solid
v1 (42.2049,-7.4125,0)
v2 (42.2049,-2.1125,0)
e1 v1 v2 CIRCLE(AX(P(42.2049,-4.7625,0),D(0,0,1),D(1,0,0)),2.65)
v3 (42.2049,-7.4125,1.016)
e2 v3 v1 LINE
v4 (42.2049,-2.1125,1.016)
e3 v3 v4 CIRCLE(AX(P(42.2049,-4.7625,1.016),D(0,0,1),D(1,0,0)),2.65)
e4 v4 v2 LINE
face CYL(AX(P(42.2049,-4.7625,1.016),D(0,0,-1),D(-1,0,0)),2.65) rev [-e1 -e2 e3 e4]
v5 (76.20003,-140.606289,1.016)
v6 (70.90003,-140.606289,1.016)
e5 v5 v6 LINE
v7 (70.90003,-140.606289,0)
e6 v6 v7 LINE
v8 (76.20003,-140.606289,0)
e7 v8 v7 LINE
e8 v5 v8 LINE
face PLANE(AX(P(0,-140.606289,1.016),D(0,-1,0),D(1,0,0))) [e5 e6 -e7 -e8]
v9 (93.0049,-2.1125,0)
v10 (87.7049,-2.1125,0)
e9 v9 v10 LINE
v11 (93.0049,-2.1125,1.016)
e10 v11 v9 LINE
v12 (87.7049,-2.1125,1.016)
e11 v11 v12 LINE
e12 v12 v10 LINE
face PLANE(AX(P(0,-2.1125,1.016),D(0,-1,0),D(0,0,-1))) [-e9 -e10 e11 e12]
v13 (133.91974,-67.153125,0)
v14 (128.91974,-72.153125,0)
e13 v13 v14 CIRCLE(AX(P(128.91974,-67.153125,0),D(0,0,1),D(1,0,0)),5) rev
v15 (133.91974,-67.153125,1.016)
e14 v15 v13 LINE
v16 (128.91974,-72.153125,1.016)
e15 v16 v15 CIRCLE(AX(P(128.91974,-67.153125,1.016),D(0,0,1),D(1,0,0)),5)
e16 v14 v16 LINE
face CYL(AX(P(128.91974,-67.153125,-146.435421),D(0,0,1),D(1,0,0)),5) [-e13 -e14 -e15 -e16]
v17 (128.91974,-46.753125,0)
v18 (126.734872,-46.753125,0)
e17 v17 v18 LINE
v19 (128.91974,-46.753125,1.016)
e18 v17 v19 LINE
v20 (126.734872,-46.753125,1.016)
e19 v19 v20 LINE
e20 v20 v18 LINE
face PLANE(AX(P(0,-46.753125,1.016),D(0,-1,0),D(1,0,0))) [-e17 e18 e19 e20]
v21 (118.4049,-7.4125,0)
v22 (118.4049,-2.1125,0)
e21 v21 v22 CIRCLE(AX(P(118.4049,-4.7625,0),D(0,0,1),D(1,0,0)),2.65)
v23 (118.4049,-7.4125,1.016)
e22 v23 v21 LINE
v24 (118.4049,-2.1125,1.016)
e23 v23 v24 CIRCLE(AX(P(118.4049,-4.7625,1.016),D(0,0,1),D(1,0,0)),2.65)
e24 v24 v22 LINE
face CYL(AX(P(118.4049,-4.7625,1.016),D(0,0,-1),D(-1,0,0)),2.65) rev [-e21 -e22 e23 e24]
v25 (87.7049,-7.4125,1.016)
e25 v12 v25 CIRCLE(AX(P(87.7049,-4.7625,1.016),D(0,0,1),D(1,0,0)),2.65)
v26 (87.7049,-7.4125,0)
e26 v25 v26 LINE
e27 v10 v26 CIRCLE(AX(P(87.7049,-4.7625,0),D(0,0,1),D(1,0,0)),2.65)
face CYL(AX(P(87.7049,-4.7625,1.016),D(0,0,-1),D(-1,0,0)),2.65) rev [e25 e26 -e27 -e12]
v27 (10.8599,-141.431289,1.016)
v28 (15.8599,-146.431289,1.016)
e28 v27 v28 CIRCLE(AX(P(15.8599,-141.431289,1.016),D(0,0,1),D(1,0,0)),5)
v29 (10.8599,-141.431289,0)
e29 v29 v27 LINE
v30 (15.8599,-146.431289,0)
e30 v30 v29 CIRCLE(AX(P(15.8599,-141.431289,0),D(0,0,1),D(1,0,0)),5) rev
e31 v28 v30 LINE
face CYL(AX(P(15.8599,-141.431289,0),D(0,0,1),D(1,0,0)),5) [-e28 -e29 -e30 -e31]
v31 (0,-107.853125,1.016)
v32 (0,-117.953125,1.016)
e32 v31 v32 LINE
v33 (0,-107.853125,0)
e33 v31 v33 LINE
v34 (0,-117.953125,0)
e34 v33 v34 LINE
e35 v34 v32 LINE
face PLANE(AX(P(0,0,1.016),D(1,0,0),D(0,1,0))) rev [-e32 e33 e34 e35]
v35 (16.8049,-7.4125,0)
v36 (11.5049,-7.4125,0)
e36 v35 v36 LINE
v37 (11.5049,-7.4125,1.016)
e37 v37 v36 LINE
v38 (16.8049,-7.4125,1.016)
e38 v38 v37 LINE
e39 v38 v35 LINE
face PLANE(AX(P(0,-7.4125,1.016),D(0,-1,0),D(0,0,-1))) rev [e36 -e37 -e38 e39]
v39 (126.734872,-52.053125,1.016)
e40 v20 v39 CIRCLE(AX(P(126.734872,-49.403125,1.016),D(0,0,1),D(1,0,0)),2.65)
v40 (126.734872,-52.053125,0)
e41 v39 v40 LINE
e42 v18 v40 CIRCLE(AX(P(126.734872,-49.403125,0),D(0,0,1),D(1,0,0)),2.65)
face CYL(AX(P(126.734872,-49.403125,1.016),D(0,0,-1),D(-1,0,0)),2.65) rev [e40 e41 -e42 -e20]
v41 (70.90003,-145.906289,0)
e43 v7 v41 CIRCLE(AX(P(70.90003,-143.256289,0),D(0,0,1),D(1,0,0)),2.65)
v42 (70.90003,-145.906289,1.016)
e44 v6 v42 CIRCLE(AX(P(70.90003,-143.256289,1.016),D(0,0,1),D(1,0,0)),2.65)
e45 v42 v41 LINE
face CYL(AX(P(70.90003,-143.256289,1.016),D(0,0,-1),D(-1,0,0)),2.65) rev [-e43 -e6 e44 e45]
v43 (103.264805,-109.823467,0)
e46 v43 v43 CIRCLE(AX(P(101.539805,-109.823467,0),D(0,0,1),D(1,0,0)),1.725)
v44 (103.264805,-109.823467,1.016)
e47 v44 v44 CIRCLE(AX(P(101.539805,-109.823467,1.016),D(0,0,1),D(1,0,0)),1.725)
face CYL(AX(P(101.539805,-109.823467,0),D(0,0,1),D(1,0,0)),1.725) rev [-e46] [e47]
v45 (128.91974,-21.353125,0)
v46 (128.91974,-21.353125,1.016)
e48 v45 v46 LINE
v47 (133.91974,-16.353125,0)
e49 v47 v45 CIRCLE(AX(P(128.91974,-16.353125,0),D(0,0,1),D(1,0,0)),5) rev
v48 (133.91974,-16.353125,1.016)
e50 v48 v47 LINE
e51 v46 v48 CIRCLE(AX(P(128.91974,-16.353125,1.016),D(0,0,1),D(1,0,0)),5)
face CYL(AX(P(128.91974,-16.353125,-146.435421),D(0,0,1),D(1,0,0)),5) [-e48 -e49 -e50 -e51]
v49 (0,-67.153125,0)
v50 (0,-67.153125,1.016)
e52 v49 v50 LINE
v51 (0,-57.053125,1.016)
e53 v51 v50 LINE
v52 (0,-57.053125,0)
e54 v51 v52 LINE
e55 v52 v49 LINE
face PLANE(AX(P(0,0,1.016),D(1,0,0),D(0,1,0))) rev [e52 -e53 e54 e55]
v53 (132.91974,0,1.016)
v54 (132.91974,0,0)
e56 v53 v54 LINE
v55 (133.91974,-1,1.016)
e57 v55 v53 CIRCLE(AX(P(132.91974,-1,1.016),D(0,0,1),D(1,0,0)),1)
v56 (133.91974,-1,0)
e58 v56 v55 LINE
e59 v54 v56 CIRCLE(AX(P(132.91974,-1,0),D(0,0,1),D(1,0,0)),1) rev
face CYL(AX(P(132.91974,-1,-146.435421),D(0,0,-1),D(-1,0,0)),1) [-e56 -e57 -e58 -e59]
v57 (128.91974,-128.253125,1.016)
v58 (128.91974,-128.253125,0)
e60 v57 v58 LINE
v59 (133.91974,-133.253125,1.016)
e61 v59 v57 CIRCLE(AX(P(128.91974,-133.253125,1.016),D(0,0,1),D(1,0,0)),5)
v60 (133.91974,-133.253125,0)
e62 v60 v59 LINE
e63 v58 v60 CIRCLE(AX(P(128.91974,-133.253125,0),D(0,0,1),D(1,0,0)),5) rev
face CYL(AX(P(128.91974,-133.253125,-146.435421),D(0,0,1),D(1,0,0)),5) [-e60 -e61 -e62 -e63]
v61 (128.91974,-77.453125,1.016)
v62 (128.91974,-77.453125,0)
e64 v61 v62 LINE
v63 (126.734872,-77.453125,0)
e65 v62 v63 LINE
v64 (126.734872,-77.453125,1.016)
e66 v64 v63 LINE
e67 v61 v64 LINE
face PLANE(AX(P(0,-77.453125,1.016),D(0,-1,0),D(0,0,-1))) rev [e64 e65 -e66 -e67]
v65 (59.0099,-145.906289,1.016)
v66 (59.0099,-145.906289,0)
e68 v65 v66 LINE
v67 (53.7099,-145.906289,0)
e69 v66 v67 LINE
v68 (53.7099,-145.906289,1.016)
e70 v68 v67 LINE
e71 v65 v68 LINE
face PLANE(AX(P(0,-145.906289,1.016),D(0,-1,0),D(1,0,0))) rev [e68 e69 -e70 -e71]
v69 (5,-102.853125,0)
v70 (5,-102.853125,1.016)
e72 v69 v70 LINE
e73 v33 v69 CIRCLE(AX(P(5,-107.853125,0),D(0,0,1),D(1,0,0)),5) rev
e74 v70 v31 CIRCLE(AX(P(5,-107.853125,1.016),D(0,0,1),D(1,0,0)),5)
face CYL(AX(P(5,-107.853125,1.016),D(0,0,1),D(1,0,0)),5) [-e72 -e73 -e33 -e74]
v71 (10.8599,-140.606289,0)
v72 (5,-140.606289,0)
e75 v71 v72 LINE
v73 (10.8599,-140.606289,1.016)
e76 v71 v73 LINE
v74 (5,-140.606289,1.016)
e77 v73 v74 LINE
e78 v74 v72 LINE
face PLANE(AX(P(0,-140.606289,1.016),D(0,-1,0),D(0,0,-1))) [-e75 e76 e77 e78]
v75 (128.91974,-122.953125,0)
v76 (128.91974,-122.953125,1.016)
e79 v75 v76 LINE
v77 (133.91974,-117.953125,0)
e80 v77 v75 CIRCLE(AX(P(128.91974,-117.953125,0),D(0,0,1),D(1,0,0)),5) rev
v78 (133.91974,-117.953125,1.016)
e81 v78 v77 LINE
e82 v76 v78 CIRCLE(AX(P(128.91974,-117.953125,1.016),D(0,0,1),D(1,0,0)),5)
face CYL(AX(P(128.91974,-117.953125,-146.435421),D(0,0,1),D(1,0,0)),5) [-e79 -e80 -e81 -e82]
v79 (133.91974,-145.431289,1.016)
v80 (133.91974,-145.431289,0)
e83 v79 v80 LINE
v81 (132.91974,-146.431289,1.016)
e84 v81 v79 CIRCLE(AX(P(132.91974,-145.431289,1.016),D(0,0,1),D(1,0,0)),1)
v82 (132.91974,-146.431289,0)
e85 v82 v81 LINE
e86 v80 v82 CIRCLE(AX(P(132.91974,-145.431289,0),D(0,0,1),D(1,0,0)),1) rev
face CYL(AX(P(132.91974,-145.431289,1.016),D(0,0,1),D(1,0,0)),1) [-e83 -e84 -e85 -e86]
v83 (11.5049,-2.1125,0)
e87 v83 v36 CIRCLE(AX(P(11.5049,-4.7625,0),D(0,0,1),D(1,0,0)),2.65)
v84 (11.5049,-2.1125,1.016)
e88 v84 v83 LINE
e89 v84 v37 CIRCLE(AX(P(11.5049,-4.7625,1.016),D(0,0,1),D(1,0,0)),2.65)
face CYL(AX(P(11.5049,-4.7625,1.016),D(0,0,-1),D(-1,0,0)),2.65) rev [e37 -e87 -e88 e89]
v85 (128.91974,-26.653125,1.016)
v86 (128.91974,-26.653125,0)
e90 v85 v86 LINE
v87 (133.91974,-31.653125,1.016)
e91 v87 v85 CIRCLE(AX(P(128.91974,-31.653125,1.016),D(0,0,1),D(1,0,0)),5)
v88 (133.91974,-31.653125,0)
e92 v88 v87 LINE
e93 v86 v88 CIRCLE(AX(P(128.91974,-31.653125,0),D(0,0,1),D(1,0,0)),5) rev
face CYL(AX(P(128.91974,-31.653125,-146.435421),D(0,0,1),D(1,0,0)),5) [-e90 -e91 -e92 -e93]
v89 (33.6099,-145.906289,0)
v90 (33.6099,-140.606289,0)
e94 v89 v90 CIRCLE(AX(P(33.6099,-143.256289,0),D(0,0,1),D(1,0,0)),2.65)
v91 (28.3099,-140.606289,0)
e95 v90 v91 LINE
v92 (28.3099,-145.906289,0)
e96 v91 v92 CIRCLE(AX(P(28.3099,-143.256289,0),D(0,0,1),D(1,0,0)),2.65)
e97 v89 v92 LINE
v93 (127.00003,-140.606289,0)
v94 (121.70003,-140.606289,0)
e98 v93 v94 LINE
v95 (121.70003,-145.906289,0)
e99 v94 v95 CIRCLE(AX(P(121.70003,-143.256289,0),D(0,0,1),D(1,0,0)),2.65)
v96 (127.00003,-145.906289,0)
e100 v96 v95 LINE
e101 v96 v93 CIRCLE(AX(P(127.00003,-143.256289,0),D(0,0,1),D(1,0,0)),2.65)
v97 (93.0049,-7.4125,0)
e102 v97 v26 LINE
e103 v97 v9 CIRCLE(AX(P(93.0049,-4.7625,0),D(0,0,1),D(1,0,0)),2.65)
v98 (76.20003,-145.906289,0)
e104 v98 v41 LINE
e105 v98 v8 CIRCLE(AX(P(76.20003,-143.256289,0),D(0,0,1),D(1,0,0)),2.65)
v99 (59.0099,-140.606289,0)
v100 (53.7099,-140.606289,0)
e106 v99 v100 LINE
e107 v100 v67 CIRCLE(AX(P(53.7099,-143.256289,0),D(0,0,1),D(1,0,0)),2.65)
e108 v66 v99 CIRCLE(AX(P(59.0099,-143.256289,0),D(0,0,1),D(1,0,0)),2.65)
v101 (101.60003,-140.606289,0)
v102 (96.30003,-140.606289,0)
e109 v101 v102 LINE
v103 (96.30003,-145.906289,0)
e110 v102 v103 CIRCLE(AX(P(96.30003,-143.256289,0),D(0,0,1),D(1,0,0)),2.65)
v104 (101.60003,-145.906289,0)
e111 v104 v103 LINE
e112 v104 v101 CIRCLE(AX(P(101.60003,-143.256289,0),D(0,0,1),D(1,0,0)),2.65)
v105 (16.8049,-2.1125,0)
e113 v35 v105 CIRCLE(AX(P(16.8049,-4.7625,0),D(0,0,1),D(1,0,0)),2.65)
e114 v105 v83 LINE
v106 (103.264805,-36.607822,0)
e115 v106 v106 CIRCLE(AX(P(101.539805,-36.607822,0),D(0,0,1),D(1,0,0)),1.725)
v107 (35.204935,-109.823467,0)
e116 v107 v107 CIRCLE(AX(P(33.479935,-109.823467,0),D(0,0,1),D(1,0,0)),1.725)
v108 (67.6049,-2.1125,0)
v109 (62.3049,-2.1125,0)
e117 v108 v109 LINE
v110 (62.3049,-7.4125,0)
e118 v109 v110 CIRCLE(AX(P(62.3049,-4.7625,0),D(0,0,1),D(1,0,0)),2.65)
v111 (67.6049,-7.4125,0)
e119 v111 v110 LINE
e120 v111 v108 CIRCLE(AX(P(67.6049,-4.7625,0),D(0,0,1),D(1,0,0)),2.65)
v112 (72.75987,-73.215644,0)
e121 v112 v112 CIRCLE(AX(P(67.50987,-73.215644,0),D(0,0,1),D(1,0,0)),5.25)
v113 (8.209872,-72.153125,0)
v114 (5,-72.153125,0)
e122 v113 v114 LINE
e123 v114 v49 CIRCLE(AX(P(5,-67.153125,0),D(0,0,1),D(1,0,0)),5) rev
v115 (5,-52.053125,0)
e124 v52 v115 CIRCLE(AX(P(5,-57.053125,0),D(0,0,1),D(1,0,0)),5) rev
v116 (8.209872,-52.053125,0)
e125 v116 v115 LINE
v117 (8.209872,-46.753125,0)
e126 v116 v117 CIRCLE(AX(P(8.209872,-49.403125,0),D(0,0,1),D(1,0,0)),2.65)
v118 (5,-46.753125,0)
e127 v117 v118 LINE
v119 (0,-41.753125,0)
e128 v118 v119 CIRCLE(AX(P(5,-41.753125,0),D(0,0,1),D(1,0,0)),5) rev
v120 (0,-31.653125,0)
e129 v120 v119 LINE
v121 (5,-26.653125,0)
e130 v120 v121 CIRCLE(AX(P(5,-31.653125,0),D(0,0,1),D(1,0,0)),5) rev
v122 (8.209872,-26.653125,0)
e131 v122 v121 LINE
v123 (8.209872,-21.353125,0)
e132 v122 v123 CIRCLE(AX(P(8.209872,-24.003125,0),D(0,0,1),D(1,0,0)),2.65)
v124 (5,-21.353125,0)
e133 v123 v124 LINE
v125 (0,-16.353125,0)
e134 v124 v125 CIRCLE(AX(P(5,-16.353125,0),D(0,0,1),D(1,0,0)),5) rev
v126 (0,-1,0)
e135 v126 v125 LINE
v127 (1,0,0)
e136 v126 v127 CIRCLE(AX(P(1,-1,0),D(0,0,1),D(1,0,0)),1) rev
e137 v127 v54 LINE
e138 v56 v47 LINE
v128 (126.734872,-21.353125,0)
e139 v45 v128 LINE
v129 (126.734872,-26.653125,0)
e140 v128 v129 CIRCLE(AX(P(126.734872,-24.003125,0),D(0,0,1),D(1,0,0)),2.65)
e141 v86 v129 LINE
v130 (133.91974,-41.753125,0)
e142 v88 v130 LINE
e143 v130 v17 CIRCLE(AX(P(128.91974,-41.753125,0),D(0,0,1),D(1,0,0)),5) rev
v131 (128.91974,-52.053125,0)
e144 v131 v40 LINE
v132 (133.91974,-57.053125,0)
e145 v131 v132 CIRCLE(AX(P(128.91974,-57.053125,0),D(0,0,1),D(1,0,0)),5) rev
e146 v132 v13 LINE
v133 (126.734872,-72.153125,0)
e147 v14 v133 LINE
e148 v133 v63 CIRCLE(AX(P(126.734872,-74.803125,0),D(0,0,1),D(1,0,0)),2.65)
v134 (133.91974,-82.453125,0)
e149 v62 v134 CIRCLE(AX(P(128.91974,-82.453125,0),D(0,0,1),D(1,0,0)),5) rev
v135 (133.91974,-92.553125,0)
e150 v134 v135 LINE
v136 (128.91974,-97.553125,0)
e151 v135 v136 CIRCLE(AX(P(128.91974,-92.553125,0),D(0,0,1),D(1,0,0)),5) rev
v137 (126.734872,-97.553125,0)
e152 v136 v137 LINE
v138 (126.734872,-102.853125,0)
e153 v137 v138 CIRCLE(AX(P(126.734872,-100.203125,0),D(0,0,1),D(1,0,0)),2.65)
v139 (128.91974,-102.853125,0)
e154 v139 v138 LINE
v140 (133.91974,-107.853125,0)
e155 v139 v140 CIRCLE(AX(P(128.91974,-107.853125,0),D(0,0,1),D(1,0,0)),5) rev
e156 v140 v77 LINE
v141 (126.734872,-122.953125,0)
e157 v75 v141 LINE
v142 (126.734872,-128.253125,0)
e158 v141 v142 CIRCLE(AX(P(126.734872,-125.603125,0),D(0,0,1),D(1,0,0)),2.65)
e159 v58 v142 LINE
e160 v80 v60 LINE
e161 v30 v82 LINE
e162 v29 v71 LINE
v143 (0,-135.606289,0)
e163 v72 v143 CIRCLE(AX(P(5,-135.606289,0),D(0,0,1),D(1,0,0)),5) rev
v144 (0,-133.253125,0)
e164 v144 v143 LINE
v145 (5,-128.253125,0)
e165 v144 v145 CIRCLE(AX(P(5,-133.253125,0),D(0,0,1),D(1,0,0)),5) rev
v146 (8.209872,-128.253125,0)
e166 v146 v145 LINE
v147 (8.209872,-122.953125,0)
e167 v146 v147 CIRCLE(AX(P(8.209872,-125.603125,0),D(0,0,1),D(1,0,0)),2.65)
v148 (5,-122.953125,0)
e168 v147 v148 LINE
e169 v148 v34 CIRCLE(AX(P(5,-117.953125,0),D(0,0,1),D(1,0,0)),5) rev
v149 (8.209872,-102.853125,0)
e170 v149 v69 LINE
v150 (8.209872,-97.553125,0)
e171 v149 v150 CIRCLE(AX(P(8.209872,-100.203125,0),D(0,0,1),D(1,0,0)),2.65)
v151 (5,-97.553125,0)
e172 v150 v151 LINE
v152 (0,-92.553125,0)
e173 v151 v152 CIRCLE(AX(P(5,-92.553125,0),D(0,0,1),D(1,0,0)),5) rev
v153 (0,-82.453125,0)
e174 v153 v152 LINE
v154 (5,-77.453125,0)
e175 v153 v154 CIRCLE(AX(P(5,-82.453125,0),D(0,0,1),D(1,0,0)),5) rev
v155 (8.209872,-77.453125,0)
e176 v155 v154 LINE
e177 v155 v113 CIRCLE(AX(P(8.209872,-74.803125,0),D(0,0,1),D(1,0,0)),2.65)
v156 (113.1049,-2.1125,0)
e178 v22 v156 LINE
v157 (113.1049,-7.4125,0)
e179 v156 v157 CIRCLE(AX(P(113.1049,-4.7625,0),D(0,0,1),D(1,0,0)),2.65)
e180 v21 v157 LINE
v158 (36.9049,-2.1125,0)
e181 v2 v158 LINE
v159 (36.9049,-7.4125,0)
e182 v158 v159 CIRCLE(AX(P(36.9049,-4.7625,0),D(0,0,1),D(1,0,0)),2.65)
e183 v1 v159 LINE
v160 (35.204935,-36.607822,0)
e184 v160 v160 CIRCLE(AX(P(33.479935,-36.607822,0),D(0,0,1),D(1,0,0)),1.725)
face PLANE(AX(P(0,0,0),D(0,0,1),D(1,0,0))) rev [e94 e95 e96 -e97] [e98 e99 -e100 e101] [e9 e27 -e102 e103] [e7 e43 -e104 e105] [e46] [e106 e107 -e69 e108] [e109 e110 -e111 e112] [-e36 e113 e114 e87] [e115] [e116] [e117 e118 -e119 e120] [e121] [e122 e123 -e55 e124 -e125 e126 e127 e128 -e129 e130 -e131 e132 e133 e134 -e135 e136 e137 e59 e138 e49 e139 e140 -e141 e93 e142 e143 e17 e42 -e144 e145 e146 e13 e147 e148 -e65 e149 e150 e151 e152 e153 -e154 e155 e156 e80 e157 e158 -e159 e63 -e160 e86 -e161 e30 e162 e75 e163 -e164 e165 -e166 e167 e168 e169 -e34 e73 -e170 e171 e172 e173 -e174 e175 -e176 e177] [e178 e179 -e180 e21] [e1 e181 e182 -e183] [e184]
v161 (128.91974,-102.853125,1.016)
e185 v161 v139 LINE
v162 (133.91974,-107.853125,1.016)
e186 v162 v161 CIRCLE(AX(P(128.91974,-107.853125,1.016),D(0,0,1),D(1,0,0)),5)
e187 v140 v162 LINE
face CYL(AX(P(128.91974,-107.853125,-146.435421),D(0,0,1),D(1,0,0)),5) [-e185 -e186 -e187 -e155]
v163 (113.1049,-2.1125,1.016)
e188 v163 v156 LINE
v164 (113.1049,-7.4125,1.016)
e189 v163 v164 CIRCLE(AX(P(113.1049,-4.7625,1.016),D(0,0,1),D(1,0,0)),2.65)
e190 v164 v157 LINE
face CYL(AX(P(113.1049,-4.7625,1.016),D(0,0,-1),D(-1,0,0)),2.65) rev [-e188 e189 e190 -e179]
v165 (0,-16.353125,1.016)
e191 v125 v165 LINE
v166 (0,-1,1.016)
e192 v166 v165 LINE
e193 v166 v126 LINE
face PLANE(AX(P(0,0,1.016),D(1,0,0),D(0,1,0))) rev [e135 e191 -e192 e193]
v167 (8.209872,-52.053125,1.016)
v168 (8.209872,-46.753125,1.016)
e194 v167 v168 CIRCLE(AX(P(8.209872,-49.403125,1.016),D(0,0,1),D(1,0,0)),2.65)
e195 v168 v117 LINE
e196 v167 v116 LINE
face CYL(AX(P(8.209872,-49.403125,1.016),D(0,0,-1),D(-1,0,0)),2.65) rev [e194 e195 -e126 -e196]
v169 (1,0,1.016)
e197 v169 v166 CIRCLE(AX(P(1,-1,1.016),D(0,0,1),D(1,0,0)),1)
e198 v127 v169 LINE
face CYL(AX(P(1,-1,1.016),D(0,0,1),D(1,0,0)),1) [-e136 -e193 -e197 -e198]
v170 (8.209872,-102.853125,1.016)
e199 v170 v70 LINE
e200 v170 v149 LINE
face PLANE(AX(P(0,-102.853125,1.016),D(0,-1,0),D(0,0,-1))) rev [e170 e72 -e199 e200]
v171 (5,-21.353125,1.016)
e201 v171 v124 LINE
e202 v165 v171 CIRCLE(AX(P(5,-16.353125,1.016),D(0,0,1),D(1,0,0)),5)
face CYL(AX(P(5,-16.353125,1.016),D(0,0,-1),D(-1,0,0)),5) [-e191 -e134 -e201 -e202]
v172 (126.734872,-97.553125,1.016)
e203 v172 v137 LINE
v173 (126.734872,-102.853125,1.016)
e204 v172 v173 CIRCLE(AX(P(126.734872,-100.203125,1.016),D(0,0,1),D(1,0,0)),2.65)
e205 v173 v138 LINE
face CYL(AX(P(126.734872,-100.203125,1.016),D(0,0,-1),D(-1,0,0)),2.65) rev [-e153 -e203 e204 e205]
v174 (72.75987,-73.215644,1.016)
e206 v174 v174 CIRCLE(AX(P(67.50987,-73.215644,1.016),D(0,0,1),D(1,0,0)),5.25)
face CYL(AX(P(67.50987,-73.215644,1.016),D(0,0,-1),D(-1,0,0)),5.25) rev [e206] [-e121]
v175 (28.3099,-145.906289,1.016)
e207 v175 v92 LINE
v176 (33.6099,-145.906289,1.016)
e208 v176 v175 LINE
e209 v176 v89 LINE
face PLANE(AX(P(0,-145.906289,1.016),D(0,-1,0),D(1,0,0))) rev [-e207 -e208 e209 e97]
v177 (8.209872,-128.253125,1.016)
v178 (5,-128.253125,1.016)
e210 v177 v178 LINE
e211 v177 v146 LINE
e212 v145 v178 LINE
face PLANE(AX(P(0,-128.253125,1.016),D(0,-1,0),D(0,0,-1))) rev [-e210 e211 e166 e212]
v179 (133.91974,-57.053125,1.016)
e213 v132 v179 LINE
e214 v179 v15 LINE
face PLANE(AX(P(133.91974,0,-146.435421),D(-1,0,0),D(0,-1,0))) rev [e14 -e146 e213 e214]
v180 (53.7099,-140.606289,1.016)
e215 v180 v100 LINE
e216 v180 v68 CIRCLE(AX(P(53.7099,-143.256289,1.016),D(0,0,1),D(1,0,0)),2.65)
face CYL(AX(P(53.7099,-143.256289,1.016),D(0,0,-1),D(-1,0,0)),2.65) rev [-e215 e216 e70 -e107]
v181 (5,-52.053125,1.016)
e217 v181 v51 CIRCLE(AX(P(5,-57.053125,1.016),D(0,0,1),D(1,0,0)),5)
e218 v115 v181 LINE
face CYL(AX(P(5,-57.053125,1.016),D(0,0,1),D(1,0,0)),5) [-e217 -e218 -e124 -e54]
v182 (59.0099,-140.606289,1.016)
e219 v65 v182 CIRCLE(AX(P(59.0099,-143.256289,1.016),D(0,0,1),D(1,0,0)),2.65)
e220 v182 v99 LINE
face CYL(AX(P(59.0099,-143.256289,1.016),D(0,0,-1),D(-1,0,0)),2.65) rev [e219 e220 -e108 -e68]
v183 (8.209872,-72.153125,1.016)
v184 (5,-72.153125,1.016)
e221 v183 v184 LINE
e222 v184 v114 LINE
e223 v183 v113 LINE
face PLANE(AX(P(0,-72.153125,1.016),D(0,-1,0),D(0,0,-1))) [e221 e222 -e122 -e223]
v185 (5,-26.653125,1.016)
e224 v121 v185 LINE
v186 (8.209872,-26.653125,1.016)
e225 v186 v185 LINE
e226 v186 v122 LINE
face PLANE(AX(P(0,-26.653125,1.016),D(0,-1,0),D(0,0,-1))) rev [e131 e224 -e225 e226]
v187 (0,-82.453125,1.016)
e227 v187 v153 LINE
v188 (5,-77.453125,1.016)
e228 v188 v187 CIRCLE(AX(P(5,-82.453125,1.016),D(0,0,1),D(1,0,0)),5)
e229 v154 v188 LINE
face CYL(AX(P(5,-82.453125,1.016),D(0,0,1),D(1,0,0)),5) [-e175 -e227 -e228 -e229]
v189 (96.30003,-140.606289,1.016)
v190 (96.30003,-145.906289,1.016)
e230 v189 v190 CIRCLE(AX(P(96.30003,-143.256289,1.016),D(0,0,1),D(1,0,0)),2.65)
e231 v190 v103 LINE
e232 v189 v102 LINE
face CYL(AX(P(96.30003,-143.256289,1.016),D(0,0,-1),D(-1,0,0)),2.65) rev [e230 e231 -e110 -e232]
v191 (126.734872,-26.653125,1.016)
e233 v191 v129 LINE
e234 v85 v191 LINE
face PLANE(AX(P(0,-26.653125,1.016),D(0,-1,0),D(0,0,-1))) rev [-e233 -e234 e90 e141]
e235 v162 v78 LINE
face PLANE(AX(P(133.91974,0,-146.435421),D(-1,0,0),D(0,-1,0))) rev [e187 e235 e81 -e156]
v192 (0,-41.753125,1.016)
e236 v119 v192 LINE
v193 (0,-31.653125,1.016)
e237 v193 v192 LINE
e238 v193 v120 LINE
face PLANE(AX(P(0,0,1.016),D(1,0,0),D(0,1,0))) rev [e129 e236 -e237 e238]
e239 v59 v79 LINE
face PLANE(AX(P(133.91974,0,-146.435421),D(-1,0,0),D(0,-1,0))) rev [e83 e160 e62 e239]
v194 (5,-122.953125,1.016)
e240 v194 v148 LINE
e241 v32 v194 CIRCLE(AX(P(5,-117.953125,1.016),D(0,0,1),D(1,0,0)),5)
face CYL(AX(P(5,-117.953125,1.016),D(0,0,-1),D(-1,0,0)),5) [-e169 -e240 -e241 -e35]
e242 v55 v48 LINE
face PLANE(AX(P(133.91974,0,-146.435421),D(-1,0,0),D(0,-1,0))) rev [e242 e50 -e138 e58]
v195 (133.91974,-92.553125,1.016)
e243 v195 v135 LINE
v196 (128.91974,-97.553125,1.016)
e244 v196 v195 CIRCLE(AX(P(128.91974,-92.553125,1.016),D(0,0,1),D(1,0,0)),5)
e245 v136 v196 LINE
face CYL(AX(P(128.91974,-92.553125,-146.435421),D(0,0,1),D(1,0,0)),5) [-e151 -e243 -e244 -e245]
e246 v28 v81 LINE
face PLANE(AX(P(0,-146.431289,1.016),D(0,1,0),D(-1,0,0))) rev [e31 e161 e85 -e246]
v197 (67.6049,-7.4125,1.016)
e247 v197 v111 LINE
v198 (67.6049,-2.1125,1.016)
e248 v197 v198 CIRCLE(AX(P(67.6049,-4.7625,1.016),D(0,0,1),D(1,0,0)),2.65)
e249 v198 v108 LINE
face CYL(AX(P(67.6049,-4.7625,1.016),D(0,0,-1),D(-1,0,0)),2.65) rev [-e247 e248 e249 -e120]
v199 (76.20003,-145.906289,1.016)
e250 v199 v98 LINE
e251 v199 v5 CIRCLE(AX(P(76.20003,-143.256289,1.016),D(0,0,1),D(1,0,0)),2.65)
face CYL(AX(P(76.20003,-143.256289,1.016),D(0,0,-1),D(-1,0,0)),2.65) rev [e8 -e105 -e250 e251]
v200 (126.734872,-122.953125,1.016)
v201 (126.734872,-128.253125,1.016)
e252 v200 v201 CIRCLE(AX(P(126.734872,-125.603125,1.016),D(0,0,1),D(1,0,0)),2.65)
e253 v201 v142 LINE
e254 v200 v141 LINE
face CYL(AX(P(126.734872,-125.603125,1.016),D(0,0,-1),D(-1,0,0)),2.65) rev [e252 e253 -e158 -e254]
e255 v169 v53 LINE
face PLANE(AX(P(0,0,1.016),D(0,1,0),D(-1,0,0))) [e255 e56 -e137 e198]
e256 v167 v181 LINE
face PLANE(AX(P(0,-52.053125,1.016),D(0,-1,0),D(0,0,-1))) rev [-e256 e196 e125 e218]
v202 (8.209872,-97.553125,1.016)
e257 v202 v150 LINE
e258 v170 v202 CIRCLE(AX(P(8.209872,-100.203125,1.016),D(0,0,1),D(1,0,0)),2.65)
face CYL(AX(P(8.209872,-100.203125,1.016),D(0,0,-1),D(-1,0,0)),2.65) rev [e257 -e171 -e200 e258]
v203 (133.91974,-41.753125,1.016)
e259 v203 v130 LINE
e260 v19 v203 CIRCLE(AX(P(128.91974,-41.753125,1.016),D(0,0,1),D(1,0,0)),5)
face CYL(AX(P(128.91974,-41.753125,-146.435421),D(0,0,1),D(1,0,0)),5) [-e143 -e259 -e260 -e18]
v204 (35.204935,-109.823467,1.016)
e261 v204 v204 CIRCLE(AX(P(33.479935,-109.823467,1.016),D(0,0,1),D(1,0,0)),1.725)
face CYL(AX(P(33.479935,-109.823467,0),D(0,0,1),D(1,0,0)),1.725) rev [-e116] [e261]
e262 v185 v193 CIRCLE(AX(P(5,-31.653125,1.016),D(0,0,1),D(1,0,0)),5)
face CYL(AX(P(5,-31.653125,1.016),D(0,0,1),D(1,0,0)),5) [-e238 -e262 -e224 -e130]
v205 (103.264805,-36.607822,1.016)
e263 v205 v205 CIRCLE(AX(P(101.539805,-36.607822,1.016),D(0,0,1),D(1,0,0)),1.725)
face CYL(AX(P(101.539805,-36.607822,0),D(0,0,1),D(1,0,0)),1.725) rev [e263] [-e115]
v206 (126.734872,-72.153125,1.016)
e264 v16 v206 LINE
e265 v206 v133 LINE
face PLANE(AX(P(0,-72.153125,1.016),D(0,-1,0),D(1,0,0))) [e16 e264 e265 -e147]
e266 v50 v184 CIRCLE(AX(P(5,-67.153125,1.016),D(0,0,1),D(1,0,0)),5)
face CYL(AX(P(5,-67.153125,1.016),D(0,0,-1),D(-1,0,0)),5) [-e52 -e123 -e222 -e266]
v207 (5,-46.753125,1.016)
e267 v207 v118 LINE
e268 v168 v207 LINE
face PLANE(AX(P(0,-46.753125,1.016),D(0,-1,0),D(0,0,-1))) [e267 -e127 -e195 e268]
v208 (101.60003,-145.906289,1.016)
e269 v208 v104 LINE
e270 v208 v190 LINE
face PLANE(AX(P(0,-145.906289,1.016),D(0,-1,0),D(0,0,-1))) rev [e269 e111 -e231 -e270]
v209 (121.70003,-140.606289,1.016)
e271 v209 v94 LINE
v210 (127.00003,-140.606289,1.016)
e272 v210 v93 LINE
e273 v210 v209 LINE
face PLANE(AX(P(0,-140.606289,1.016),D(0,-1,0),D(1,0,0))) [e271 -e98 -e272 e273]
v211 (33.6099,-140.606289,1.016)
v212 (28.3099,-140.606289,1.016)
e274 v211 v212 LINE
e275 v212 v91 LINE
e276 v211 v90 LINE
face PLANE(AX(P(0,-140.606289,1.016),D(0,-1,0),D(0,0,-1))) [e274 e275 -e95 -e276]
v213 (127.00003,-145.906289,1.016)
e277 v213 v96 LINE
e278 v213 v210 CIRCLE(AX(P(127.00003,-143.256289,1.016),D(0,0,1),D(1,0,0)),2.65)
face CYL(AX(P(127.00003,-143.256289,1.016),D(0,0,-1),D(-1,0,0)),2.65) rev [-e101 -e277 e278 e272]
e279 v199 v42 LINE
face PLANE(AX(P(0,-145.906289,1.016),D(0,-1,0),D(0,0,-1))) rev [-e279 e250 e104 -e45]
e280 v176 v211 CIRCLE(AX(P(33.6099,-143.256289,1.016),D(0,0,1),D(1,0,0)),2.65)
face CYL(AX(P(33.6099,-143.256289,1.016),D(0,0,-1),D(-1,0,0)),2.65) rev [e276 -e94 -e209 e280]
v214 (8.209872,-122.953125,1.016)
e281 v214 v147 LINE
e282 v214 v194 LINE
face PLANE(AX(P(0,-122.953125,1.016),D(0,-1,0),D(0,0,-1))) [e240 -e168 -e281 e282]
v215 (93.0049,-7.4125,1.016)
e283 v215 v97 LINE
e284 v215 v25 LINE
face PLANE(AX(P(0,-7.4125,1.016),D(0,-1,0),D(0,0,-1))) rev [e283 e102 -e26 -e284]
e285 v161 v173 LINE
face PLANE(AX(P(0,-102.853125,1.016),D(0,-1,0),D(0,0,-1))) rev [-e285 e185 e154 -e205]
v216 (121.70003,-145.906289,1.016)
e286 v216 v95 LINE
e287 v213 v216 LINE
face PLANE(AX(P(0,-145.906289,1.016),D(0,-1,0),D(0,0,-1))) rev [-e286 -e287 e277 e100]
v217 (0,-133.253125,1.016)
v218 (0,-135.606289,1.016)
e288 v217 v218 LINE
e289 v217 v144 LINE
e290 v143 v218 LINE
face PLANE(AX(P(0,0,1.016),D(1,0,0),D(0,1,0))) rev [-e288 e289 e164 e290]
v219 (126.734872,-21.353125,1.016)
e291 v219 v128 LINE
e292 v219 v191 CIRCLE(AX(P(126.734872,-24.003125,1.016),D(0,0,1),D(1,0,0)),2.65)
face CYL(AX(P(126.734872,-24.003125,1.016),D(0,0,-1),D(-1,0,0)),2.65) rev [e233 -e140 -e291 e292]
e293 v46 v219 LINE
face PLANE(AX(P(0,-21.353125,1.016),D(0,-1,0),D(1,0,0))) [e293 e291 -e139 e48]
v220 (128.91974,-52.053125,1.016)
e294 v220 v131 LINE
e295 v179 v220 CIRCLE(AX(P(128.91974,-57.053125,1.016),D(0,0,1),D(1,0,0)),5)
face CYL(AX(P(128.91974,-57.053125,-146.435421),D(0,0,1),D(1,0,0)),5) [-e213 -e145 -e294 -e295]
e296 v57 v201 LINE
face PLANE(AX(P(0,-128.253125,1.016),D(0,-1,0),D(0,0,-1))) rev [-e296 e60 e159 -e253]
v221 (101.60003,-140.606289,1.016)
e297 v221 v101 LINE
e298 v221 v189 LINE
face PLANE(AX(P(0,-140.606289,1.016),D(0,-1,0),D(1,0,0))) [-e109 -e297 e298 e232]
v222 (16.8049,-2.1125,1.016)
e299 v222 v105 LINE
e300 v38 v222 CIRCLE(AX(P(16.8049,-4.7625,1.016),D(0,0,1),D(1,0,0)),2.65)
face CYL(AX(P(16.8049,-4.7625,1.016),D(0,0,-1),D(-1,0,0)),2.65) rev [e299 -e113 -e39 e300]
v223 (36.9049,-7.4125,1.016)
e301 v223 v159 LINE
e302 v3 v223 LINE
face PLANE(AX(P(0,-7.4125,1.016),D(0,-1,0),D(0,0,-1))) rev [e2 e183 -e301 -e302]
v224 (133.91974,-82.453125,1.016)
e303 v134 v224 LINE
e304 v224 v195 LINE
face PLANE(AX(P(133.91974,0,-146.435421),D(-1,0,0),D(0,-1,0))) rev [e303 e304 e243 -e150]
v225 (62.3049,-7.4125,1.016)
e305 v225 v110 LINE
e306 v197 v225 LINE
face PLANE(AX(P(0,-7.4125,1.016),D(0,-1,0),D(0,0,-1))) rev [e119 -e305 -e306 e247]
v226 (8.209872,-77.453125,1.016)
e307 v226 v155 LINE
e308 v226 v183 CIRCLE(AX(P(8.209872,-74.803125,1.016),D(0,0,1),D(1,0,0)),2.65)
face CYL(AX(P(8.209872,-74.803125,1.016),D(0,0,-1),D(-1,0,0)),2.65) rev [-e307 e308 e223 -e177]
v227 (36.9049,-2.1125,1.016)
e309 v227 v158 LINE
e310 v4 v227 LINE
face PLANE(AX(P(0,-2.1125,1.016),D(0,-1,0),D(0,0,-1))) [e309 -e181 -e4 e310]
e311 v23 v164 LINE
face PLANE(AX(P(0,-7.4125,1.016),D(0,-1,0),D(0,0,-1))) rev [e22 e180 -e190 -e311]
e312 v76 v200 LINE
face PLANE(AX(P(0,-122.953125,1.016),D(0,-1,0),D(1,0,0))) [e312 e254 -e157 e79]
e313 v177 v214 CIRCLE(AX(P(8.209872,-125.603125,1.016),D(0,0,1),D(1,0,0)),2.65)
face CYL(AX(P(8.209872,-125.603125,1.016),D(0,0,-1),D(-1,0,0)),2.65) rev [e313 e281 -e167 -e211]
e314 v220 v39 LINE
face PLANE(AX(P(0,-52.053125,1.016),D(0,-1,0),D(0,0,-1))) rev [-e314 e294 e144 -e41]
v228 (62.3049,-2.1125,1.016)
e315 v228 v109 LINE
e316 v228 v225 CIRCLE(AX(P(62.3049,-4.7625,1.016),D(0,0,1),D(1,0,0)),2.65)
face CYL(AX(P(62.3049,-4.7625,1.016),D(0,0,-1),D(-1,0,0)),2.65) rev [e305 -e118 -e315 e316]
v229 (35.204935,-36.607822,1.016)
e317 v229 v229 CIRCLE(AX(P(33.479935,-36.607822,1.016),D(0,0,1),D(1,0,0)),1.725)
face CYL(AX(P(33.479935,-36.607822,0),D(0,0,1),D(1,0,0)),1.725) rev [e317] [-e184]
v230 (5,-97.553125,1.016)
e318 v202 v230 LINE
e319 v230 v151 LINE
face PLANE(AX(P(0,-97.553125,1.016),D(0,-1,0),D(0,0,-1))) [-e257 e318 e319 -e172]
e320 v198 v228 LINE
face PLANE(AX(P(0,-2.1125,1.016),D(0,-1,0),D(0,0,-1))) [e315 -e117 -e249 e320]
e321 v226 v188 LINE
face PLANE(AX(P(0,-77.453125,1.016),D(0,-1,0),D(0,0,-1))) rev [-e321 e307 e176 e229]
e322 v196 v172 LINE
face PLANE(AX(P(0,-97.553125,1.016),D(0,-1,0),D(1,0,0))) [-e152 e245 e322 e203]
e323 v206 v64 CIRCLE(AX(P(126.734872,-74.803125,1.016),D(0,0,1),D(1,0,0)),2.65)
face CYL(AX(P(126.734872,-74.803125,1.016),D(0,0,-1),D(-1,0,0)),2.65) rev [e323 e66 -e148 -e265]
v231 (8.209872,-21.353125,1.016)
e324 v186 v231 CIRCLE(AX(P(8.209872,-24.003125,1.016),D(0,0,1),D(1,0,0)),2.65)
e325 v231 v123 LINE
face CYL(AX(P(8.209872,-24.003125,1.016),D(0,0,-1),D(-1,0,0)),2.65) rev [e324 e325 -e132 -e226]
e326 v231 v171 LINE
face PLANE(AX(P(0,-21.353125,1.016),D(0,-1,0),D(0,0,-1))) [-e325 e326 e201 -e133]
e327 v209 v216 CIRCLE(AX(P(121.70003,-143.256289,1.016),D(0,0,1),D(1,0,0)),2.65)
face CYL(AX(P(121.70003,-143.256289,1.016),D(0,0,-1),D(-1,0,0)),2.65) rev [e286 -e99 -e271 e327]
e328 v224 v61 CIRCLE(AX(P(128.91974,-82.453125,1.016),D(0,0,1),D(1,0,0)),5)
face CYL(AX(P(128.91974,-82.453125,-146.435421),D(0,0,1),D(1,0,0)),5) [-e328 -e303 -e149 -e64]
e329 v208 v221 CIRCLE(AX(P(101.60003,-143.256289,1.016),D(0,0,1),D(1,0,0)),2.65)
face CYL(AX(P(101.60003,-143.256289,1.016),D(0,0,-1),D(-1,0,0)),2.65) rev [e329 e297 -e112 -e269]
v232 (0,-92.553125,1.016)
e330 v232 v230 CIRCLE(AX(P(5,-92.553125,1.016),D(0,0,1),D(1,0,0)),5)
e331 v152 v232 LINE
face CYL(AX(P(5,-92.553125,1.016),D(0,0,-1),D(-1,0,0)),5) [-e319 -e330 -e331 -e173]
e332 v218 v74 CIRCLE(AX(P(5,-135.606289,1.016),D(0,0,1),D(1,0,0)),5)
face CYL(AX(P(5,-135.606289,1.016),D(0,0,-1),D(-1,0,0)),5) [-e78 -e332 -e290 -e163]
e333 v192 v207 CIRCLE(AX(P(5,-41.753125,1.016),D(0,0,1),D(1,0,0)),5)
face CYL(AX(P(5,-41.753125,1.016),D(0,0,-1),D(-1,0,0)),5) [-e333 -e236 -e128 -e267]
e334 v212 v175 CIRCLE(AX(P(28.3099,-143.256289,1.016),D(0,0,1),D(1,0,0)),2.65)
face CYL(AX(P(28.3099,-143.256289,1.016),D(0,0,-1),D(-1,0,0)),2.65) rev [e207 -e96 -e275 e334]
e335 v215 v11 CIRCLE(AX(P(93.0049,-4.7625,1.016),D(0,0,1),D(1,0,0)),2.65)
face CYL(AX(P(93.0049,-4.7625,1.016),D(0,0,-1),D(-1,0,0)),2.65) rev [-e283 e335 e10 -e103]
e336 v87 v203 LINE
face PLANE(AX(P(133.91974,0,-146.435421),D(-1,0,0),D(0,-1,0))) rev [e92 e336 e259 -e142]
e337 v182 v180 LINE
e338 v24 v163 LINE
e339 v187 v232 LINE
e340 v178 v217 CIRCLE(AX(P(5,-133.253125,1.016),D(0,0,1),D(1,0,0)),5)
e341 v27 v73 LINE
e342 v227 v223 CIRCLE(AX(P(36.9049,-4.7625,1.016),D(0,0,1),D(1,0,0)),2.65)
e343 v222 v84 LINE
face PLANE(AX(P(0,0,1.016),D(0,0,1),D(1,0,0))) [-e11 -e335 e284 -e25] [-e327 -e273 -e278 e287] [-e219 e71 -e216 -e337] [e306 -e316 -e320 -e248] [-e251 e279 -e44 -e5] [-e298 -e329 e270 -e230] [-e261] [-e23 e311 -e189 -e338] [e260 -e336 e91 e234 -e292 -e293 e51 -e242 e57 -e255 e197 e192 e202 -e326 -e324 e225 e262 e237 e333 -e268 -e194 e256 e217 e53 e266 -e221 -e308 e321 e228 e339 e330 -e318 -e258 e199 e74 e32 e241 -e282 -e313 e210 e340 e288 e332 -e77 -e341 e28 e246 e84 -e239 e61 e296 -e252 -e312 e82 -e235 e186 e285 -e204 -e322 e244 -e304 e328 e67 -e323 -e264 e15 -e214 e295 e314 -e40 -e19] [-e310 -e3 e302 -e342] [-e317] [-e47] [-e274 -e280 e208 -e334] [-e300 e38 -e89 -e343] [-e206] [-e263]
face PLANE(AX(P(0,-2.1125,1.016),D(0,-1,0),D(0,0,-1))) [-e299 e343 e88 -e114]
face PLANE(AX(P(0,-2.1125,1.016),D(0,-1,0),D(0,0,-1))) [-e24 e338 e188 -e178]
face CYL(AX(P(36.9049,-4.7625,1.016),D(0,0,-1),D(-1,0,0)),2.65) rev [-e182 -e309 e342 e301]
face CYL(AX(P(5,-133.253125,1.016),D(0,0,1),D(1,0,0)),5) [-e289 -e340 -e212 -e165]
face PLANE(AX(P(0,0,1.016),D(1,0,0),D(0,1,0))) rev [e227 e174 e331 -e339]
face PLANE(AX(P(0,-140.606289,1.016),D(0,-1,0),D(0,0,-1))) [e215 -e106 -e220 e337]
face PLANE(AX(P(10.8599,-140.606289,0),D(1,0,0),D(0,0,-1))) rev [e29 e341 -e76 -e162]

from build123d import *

# Parameters (mm, degrees)
SKETCH1_W               = 135.01974
SKETCH1_H               = 146.431289
SKETCH1_R               = 5.25
BOSS_EXTRUDE1_DEPTH     = 1.016
SKETCH3_W               = 1.1
SKETCH3_H               = 146.431289
CUT_EXTRUDE1_DEPTH      = 1.016
FILLET1_R               = 1
CUT_EXTRUDE2_DEPTH      = 199.438029157
CUT_EXTRUDE2_DEPTH_BACK = 199.438029157
SKETCH4_R               = 1.725
SKETCH4_W               = 2.90987194
SKETCH4_H               = 5.3
SKETCH4_W_2             = 10.8599
SKETCH4_H_2             = 5.825
FILLET2_R               = 5


with BuildPart() as part:
    # Sketch1 → Boss-Extrude1 (new body)
    with BuildSketch(Plane.XY):
        with Locations((67.50987, -73.2156445)):
            Rectangle(SKETCH1_W, SKETCH1_H)
        with BuildLine():
            Line((62.3049, -2.1125), (67.6049, -2.1125))
            ThreePointArc((67.6049, -2.1125), (70.2549, -4.7625), (67.6049, -7.4125))
            Line((67.6049, -7.4125), (62.3049, -7.4125))
            ThreePointArc((62.3049, -7.4125), (59.6549, -4.7625), (62.3049, -2.1125))
        make_face(mode=Mode.SUBTRACT)
        with Locations((67.50987, -73.2156445)):
            Circle(SKETCH1_R, mode=Mode.SUBTRACT)
        with BuildLine():
            Line((2.9099, -140.606289), (8.2099, -140.606289))
            ThreePointArc((8.2099, -140.606289), (10.8599, -143.256289), (8.2099, -145.906289))
            Line((8.2099, -145.906289), (2.9099, -145.906289))
            ThreePointArc((2.9099, -145.906289), (0.2599, -143.256289), (2.9099, -140.606289))
        make_face(mode=Mode.SUBTRACT)
        with BuildLine():
            Line((28.3099, -140.606289), (33.6099, -140.606289))
            ThreePointArc((33.6099, -140.606289), (36.2599, -143.256289), (33.6099, -145.906289))
            Line((33.6099, -145.906289), (28.3099, -145.906289))
            ThreePointArc((28.3099, -145.906289), (25.6599, -143.256289), (28.3099, -140.606289))
        make_face(mode=Mode.SUBTRACT)
        with BuildLine():
            Line((2.90987194, -122.953125), (8.20987194, -122.953125))
            ThreePointArc((8.20987194, -122.953125), (10.85987194, -125.603125), (8.20987194, -128.253125))
            Line((8.20987194, -128.253125), (2.90987194, -128.253125))
            ThreePointArc((2.90987194, -128.253125), (0.25987194, -125.603125), (2.90987194, -122.953125))
        make_face(mode=Mode.SUBTRACT)
        with BuildLine():
            Line((53.7099, -140.606289), (59.0099, -140.606289))
            ThreePointArc((59.0099, -140.606289), (61.6599, -143.256289), (59.0099, -145.906289))
            Line((59.0099, -145.906289), (53.7099, -145.906289))
            ThreePointArc((53.7099, -145.906289), (51.0599, -143.256289), (53.7099, -140.606289))
        make_face(mode=Mode.SUBTRACT)
        with BuildLine():
            Line((2.90987194, -97.553125), (8.20987194, -97.553125))
            ThreePointArc((8.20987194, -97.553125), (10.85987194, -100.203125), (8.20987194, -102.853125))
            Line((8.20987194, -102.853125), (2.90987194, -102.853125))
            ThreePointArc((2.90987194, -102.853125), (0.25987194, -100.203125), (2.90987194, -97.553125))
        make_face(mode=Mode.SUBTRACT)
        with BuildLine():
            Line((2.90987194, -72.153125), (8.20987194, -72.153125))
            ThreePointArc((8.20987194, -72.153125), (10.85987194, -74.803125), (8.20987194, -77.453125))
            Line((8.20987194, -77.453125), (2.90987194, -77.453125))
            ThreePointArc((2.90987194, -77.453125), (0.25987194, -74.803125), (2.90987194, -72.153125))
        make_face(mode=Mode.SUBTRACT)
        with BuildLine():
            Line((2.90987194, -46.753125), (8.20987194, -46.753125))
            ThreePointArc((8.20987194, -46.753125), (10.85987194, -49.403125), (8.20987194, -52.053125))
            Line((8.20987194, -52.053125), (2.90987194, -52.053125))
            ThreePointArc((2.90987194, -52.053125), (0.25987194, -49.403125), (2.90987194, -46.753125))
        make_face(mode=Mode.SUBTRACT)
        with BuildLine():
            Line((2.90987194, -21.353125), (8.20987194, -21.353125))
            ThreePointArc((8.20987194, -21.353125), (10.85987194, -24.003125), (8.20987194, -26.653125))
            Line((8.20987194, -26.653125), (2.90987194, -26.653125))
            ThreePointArc((2.90987194, -26.653125), (0.25987194, -24.003125), (2.90987194, -21.353125))
        make_face(mode=Mode.SUBTRACT)
        with BuildLine():
            Line((11.5049, -2.1125), (16.8049, -2.1125))
            ThreePointArc((16.8049, -2.1125), (19.4549, -4.7625), (16.8049, -7.4125))
            Line((16.8049, -7.4125), (11.5049, -7.4125))
            ThreePointArc((11.5049, -7.4125), (8.8549, -4.7625), (11.5049, -2.1125))
        make_face(mode=Mode.SUBTRACT)
        with BuildLine():
            Line((36.9049, -2.1125), (42.2049, -2.1125))
            ThreePointArc((42.2049, -2.1125), (44.8549, -4.7625), (42.2049, -7.4125))
            Line((42.2049, -7.4125), (36.9049, -7.4125))
            ThreePointArc((36.9049, -7.4125), (34.2549, -4.7625), (36.9049, -2.1125))
        make_face(mode=Mode.SUBTRACT)
        with BuildLine():
            Line((118.4049, -7.4125), (113.1049, -7.4125))
            ThreePointArc((113.1049, -7.4125), (110.4549, -4.7625), (113.1049, -2.1125))
            Line((113.1049, -2.1125), (118.4049, -2.1125))
            ThreePointArc((118.4049, -2.1125), (121.0549, -4.7625), (118.4049, -7.4125))
        make_face(mode=Mode.SUBTRACT)
        with BuildLine():
            Line((76.20003, -145.906289), (70.90003, -145.906289))
            ThreePointArc((70.90003, -145.906289), (68.25003, -143.256289), (70.90003, -140.606289))
            Line((70.90003, -140.606289), (76.20003, -140.606289))
            ThreePointArc((76.20003, -140.606289), (78.85003, -143.256289), (76.20003, -145.906289))
        make_face(mode=Mode.SUBTRACT)
        with BuildLine():
            Line((96.30003, -140.606289), (101.60003, -140.606289))
            ThreePointArc((101.60003, -140.606289), (104.25003, -143.256289), (101.60003, -145.906289))
            Line((101.60003, -145.906289), (96.30003, -145.906289))
            ThreePointArc((96.30003, -145.906289), (93.65003, -143.256289), (96.30003, -140.606289))
        make_face(mode=Mode.SUBTRACT)
        with BuildLine():
            Line((121.70003, -140.606289), (127.00003, -140.606289))
            ThreePointArc((127.00003, -140.606289), (129.65003, -143.256289), (127.00003, -145.906289))
            Line((127.00003, -145.906289), (121.70003, -145.906289))
            ThreePointArc((121.70003, -145.906289), (119.05003, -143.256289), (121.70003, -140.606289))
        make_face(mode=Mode.SUBTRACT)
        with BuildLine():
            Line((126.734872, -122.953125), (132.034872, -122.953125))
            ThreePointArc((132.034872, -122.953125), (134.684872, -125.603125), (132.034872, -128.253125))
            Line((132.034872, -128.253125), (126.734872, -128.253125))
            ThreePointArc((126.734872, -128.253125), (124.084872, -125.603125), (126.734872, -122.953125))
        make_face(mode=Mode.SUBTRACT)
        with BuildLine():
            Line((126.734872, -97.553125), (132.034872, -97.553125))
            ThreePointArc((132.034872, -97.553125), (134.684872, -100.203125), (132.034872, -102.853125))
            Line((132.034872, -102.853125), (126.734872, -102.853125))
            ThreePointArc((126.734872, -102.853125), (124.084872, -100.203125), (126.734872, -97.553125))
        make_face(mode=Mode.SUBTRACT)
        with BuildLine():
            Line((126.734872, -72.153125), (132.034872, -72.153125))
            ThreePointArc((132.034872, -72.153125), (134.684872, -74.803125), (132.034872, -77.453125))
            Line((132.034872, -77.453125), (126.734872, -77.453125))
            ThreePointArc((126.734872, -77.453125), (124.084872, -74.803125), (126.734872, -72.153125))
        make_face(mode=Mode.SUBTRACT)
        with BuildLine():
            Line((126.734872, -46.753125), (132.034872, -46.753125))
            ThreePointArc((132.034872, -46.753125), (134.684872, -49.403125), (132.034872, -52.053125))
            Line((132.034872, -52.053125), (126.734872, -52.053125))
            ThreePointArc((126.734872, -52.053125), (124.084872, -49.403125), (126.734872, -46.753125))
        make_face(mode=Mode.SUBTRACT)
        with BuildLine():
            Line((87.7049, -2.1125), (93.0049, -2.1125))
            ThreePointArc((93.0049, -2.1125), (95.6549, -4.7625), (93.0049, -7.4125))
            Line((93.0049, -7.4125), (87.7049, -7.4125))
            ThreePointArc((87.7049, -7.4125), (85.0549, -4.7625), (87.7049, -2.1125))
        make_face(mode=Mode.SUBTRACT)
        with BuildLine():
            Line((126.734872, -21.353125), (132.034872, -21.353125))
            ThreePointArc((132.034872, -21.353125), (134.684872, -24.003125), (132.034872, -26.653125))
            Line((132.034872, -26.653125), (126.734872, -26.653125))
            ThreePointArc((126.734872, -26.653125), (124.084872, -24.003125), (126.734872, -21.353125))
        make_face(mode=Mode.SUBTRACT)
    extrude(amount=BOSS_EXTRUDE1_DEPTH)

    # Sketch3 → Cut-Extrude1 (cut)
    with BuildSketch(Plane.XY.offset(1.016)):
        with Locations((134.46974, -73.2156445)):
            Rectangle(SKETCH3_W, SKETCH3_H)
    extrude(amount=-CUT_EXTRUDE1_DEPTH, mode=Mode.SUBTRACT)

    # Fillet1
    fillet1_edges = [part.edges().sort_by_distance(p)[0] for p in [
        (0, -146.431289, 0.508),
        (0, 0, 0.508),
        (133.91974, 0, 0.508),
        (133.91974, -146.431289, 0.508),
    ]]
    fillet(fillet1_edges, radius=FILLET1_R)

    # Sketch4 → Cut-Extrude2 (cut, two sides: drawn at the far end of the back side and taken through both)
    with BuildSketch(Plane.XY.offset(1.016).offset(-CUT_EXTRUDE2_DEPTH_BACK)):
        with Locations((33.479935, -36.60782225)):
            Circle(SKETCH4_R)
        with Locations((101.539805, -36.60782225)):
            Circle(SKETCH4_R)
        with Locations((101.539805, -109.82346675)):
            Circle(SKETCH4_R)
        with Locations((33.479935, -109.82346675)):
            Circle(SKETCH4_R)
        with Locations((1.45493597, -24.003125)):
            Rectangle(SKETCH4_W, SKETCH4_H)
        with Locations((1.45493597, -49.403125)):
            Rectangle(SKETCH4_W, SKETCH4_H)
        with Locations((1.45493597, -74.803125)):
            Rectangle(SKETCH4_W, SKETCH4_H)
        with Locations((1.45493597, -100.203125)):
            Rectangle(SKETCH4_W, SKETCH4_H)
        with Locations((1.45493597, -125.603125)):
            Rectangle(SKETCH4_W, SKETCH4_H)
        with Locations((5.42995, -143.518789)):
            Rectangle(SKETCH4_W_2, SKETCH4_H_2)
    extrude(amount=CUT_EXTRUDE2_DEPTH + CUT_EXTRUDE2_DEPTH_BACK, mode=Mode.SUBTRACT)

    # Fillet2
    # the kernel refuses this fillet: 5 mm, written as the material it takes off along each edge
    with BuildSketch(Plane(origin=(133.91974, -22.140392431, 15.484168578), x_dir=(-0.9878300229479848, 0.1555372809412071, 0), z_dir=(0, 0, -1))) as fillet2_piece_1:
        with BuildLine():
            CenterArc((5.839285955, 4.939150115), FILLET2_R, 171.052041894, 90)
            Line((0.90013584, 5.716836519), (0.406220829, 5.79460516))
            Line((0.406220829, 5.79460516), (-0.493915011, 0.07776864))
            Line((-0.493915011, 0.07776864), (0.296642423, -0.402496302))
            ThreePointArc((0.296642423, -0.402496302), (1.906609995, -0.00939585), (4.98383091, -0.493915011))
            Line((4.98383091, -0.493915011), (5.06159955, 0))
        make_face()
    extrude(amount=29.952337156, mode=Mode.SUBTRACT)
    with BuildSketch(Plane(origin=(133.91974, -25.865857569, 15.484168578), x_dir=(-0.987830022947984, -0.1555372809412105, 0), z_dir=(0, 0, -1)), Plane(origin=(133.91974, -51.265857569, 15.484168578), x_dir=(-0.9878300229479876, -0.1555372809411893, 0), z_dir=(0, 0, -1)), Plane(origin=(133.91974, -76.665857569, 15.484168578), x_dir=(-0.9878300229479883, -0.15553728094118519, 0), z_dir=(0, 0, -1)), Plane(origin=(133.91974, -102.065857569, 15.484168578), x_dir=(-0.9878300229479912, -0.155537280941166, 0), z_dir=(0, 0, -1)), Plane(origin=(133.91974, -127.465857569, 15.484168578), x_dir=(-0.9878300229479929, -0.15553728094115504, 0), z_dir=(0, 0, -1))) as fillet2_piece_2:
        with BuildLine():
            CenterArc((5.839285955, -4.939150115), FILLET2_R, 98.947958106, 90)
            Line((0.90013584, -5.716836519), (0.406220829, -5.79460516))
            Line((0.406220829, -5.79460516), (-0.493915011, -0.07776864))
            Line((-0.493915011, -0.07776864), (0.296642423, 0.402496302))
            ThreePointArc((0.296642423, 0.402496302), (1.906609995, 0.00939585), (4.98383091, 0.493915011))
            Line((4.98383091, 0.493915011), (5.06159955, 0))
        make_face()
    extrude(amount=29.952337156, mode=Mode.SUBTRACT)
    with BuildSketch(Plane(origin=(133.91974, -47.540392431, 15.484168578), x_dir=(0, 1, 0), z_dir=(0, 0, -1)), Plane(origin=(133.91974, -72.940392431, 15.484168578), x_dir=(0, 1, 0), z_dir=(0, 0, -1)), Plane(origin=(133.91974, -98.340392431, 15.484168578), x_dir=(0, 1, 0), z_dir=(0, 0, -1)), Plane(origin=(133.91974, -123.740392431, 15.484168578), x_dir=(0, 1, 0), z_dir=(0, 0, -1))) as fillet2_piece_3:
        with BuildLine():
            CenterArc((5.787267431, -5), FILLET2_R, 90, 90)
            Line((0.787267431, -5), (0.287267431, -5))
            ThreePointArc((0.287267431, -5), (0.287267431, -1.884868), (-0.351458975, -0.355635472))
            Line((-0.351458975, -0.355635472), (0, 0.5))
            Line((0, 0.5), (5.787267431, 0.5))
            Line((5.787267431, 0.5), (5.787267431, 0))
        make_face()
    extrude(amount=29.952337156, mode=Mode.SUBTRACT)
    with BuildSketch(Plane(origin=(0, -140.606289, -12.5), x_dir=(1, 0, 0), z_dir=(0, 0, 1)), Plane(origin=(0, -26.653125, -12.5), x_dir=(0, -1, 0), z_dir=(0, 0, 1)), Plane(origin=(0, -21.353125, -12.5), x_dir=(1, 0, 0), z_dir=(0, 0, 1)), Plane(origin=(0, -46.753125, -12.5), x_dir=(1, 0, 0), z_dir=(0, 0, 1)), Plane(origin=(0, -72.153125, -12.5), x_dir=(1, 0, 0), z_dir=(0, 0, 1)), Plane(origin=(0, -97.553125, -12.5), x_dir=(1, 0, 0), z_dir=(0, 0, 1)), Plane(origin=(0, -122.953125, -12.5), x_dir=(1, 0, 0), z_dir=(0, 0, 1))) as fillet2_piece_4:
        with BuildLine():
            CenterArc((FILLET2_R, FILLET2_R), FILLET2_R, 180, 90)
            Line((0, FILLET2_R), (0, 0))
            Line((0, 0), (FILLET2_R, 0))
        make_face()
    extrude(amount=26.016, mode=Mode.SUBTRACT)
    with BuildSketch(Plane(origin=(10.8599, -146.431289, 13.516), x_dir=(1, 0, 0), z_dir=(0, 0, -1)), Plane(origin=(0, -52.053125, 13.516), x_dir=(0, -1, 0), z_dir=(0, 0, -1)), Plane(origin=(0, -77.453125, 13.516), x_dir=(0, -1, 0), z_dir=(0, 0, -1)), Plane(origin=(0, -102.853125, 13.516), x_dir=(0, -1, 0), z_dir=(0, 0, -1)), Plane(origin=(0, -128.253125, 13.516), x_dir=(0, -1, 0), z_dir=(0, 0, -1))) as fillet2_piece_5:
        with BuildLine():
            CenterArc((FILLET2_R, -FILLET2_R), FILLET2_R, 90, 90)
            Line((0, -FILLET2_R), (0, 0))
            Line((0, 0), (FILLET2_R, 0))
        make_face()
    extrude(amount=26.016, mode=Mode.SUBTRACT)


solid = part.part
